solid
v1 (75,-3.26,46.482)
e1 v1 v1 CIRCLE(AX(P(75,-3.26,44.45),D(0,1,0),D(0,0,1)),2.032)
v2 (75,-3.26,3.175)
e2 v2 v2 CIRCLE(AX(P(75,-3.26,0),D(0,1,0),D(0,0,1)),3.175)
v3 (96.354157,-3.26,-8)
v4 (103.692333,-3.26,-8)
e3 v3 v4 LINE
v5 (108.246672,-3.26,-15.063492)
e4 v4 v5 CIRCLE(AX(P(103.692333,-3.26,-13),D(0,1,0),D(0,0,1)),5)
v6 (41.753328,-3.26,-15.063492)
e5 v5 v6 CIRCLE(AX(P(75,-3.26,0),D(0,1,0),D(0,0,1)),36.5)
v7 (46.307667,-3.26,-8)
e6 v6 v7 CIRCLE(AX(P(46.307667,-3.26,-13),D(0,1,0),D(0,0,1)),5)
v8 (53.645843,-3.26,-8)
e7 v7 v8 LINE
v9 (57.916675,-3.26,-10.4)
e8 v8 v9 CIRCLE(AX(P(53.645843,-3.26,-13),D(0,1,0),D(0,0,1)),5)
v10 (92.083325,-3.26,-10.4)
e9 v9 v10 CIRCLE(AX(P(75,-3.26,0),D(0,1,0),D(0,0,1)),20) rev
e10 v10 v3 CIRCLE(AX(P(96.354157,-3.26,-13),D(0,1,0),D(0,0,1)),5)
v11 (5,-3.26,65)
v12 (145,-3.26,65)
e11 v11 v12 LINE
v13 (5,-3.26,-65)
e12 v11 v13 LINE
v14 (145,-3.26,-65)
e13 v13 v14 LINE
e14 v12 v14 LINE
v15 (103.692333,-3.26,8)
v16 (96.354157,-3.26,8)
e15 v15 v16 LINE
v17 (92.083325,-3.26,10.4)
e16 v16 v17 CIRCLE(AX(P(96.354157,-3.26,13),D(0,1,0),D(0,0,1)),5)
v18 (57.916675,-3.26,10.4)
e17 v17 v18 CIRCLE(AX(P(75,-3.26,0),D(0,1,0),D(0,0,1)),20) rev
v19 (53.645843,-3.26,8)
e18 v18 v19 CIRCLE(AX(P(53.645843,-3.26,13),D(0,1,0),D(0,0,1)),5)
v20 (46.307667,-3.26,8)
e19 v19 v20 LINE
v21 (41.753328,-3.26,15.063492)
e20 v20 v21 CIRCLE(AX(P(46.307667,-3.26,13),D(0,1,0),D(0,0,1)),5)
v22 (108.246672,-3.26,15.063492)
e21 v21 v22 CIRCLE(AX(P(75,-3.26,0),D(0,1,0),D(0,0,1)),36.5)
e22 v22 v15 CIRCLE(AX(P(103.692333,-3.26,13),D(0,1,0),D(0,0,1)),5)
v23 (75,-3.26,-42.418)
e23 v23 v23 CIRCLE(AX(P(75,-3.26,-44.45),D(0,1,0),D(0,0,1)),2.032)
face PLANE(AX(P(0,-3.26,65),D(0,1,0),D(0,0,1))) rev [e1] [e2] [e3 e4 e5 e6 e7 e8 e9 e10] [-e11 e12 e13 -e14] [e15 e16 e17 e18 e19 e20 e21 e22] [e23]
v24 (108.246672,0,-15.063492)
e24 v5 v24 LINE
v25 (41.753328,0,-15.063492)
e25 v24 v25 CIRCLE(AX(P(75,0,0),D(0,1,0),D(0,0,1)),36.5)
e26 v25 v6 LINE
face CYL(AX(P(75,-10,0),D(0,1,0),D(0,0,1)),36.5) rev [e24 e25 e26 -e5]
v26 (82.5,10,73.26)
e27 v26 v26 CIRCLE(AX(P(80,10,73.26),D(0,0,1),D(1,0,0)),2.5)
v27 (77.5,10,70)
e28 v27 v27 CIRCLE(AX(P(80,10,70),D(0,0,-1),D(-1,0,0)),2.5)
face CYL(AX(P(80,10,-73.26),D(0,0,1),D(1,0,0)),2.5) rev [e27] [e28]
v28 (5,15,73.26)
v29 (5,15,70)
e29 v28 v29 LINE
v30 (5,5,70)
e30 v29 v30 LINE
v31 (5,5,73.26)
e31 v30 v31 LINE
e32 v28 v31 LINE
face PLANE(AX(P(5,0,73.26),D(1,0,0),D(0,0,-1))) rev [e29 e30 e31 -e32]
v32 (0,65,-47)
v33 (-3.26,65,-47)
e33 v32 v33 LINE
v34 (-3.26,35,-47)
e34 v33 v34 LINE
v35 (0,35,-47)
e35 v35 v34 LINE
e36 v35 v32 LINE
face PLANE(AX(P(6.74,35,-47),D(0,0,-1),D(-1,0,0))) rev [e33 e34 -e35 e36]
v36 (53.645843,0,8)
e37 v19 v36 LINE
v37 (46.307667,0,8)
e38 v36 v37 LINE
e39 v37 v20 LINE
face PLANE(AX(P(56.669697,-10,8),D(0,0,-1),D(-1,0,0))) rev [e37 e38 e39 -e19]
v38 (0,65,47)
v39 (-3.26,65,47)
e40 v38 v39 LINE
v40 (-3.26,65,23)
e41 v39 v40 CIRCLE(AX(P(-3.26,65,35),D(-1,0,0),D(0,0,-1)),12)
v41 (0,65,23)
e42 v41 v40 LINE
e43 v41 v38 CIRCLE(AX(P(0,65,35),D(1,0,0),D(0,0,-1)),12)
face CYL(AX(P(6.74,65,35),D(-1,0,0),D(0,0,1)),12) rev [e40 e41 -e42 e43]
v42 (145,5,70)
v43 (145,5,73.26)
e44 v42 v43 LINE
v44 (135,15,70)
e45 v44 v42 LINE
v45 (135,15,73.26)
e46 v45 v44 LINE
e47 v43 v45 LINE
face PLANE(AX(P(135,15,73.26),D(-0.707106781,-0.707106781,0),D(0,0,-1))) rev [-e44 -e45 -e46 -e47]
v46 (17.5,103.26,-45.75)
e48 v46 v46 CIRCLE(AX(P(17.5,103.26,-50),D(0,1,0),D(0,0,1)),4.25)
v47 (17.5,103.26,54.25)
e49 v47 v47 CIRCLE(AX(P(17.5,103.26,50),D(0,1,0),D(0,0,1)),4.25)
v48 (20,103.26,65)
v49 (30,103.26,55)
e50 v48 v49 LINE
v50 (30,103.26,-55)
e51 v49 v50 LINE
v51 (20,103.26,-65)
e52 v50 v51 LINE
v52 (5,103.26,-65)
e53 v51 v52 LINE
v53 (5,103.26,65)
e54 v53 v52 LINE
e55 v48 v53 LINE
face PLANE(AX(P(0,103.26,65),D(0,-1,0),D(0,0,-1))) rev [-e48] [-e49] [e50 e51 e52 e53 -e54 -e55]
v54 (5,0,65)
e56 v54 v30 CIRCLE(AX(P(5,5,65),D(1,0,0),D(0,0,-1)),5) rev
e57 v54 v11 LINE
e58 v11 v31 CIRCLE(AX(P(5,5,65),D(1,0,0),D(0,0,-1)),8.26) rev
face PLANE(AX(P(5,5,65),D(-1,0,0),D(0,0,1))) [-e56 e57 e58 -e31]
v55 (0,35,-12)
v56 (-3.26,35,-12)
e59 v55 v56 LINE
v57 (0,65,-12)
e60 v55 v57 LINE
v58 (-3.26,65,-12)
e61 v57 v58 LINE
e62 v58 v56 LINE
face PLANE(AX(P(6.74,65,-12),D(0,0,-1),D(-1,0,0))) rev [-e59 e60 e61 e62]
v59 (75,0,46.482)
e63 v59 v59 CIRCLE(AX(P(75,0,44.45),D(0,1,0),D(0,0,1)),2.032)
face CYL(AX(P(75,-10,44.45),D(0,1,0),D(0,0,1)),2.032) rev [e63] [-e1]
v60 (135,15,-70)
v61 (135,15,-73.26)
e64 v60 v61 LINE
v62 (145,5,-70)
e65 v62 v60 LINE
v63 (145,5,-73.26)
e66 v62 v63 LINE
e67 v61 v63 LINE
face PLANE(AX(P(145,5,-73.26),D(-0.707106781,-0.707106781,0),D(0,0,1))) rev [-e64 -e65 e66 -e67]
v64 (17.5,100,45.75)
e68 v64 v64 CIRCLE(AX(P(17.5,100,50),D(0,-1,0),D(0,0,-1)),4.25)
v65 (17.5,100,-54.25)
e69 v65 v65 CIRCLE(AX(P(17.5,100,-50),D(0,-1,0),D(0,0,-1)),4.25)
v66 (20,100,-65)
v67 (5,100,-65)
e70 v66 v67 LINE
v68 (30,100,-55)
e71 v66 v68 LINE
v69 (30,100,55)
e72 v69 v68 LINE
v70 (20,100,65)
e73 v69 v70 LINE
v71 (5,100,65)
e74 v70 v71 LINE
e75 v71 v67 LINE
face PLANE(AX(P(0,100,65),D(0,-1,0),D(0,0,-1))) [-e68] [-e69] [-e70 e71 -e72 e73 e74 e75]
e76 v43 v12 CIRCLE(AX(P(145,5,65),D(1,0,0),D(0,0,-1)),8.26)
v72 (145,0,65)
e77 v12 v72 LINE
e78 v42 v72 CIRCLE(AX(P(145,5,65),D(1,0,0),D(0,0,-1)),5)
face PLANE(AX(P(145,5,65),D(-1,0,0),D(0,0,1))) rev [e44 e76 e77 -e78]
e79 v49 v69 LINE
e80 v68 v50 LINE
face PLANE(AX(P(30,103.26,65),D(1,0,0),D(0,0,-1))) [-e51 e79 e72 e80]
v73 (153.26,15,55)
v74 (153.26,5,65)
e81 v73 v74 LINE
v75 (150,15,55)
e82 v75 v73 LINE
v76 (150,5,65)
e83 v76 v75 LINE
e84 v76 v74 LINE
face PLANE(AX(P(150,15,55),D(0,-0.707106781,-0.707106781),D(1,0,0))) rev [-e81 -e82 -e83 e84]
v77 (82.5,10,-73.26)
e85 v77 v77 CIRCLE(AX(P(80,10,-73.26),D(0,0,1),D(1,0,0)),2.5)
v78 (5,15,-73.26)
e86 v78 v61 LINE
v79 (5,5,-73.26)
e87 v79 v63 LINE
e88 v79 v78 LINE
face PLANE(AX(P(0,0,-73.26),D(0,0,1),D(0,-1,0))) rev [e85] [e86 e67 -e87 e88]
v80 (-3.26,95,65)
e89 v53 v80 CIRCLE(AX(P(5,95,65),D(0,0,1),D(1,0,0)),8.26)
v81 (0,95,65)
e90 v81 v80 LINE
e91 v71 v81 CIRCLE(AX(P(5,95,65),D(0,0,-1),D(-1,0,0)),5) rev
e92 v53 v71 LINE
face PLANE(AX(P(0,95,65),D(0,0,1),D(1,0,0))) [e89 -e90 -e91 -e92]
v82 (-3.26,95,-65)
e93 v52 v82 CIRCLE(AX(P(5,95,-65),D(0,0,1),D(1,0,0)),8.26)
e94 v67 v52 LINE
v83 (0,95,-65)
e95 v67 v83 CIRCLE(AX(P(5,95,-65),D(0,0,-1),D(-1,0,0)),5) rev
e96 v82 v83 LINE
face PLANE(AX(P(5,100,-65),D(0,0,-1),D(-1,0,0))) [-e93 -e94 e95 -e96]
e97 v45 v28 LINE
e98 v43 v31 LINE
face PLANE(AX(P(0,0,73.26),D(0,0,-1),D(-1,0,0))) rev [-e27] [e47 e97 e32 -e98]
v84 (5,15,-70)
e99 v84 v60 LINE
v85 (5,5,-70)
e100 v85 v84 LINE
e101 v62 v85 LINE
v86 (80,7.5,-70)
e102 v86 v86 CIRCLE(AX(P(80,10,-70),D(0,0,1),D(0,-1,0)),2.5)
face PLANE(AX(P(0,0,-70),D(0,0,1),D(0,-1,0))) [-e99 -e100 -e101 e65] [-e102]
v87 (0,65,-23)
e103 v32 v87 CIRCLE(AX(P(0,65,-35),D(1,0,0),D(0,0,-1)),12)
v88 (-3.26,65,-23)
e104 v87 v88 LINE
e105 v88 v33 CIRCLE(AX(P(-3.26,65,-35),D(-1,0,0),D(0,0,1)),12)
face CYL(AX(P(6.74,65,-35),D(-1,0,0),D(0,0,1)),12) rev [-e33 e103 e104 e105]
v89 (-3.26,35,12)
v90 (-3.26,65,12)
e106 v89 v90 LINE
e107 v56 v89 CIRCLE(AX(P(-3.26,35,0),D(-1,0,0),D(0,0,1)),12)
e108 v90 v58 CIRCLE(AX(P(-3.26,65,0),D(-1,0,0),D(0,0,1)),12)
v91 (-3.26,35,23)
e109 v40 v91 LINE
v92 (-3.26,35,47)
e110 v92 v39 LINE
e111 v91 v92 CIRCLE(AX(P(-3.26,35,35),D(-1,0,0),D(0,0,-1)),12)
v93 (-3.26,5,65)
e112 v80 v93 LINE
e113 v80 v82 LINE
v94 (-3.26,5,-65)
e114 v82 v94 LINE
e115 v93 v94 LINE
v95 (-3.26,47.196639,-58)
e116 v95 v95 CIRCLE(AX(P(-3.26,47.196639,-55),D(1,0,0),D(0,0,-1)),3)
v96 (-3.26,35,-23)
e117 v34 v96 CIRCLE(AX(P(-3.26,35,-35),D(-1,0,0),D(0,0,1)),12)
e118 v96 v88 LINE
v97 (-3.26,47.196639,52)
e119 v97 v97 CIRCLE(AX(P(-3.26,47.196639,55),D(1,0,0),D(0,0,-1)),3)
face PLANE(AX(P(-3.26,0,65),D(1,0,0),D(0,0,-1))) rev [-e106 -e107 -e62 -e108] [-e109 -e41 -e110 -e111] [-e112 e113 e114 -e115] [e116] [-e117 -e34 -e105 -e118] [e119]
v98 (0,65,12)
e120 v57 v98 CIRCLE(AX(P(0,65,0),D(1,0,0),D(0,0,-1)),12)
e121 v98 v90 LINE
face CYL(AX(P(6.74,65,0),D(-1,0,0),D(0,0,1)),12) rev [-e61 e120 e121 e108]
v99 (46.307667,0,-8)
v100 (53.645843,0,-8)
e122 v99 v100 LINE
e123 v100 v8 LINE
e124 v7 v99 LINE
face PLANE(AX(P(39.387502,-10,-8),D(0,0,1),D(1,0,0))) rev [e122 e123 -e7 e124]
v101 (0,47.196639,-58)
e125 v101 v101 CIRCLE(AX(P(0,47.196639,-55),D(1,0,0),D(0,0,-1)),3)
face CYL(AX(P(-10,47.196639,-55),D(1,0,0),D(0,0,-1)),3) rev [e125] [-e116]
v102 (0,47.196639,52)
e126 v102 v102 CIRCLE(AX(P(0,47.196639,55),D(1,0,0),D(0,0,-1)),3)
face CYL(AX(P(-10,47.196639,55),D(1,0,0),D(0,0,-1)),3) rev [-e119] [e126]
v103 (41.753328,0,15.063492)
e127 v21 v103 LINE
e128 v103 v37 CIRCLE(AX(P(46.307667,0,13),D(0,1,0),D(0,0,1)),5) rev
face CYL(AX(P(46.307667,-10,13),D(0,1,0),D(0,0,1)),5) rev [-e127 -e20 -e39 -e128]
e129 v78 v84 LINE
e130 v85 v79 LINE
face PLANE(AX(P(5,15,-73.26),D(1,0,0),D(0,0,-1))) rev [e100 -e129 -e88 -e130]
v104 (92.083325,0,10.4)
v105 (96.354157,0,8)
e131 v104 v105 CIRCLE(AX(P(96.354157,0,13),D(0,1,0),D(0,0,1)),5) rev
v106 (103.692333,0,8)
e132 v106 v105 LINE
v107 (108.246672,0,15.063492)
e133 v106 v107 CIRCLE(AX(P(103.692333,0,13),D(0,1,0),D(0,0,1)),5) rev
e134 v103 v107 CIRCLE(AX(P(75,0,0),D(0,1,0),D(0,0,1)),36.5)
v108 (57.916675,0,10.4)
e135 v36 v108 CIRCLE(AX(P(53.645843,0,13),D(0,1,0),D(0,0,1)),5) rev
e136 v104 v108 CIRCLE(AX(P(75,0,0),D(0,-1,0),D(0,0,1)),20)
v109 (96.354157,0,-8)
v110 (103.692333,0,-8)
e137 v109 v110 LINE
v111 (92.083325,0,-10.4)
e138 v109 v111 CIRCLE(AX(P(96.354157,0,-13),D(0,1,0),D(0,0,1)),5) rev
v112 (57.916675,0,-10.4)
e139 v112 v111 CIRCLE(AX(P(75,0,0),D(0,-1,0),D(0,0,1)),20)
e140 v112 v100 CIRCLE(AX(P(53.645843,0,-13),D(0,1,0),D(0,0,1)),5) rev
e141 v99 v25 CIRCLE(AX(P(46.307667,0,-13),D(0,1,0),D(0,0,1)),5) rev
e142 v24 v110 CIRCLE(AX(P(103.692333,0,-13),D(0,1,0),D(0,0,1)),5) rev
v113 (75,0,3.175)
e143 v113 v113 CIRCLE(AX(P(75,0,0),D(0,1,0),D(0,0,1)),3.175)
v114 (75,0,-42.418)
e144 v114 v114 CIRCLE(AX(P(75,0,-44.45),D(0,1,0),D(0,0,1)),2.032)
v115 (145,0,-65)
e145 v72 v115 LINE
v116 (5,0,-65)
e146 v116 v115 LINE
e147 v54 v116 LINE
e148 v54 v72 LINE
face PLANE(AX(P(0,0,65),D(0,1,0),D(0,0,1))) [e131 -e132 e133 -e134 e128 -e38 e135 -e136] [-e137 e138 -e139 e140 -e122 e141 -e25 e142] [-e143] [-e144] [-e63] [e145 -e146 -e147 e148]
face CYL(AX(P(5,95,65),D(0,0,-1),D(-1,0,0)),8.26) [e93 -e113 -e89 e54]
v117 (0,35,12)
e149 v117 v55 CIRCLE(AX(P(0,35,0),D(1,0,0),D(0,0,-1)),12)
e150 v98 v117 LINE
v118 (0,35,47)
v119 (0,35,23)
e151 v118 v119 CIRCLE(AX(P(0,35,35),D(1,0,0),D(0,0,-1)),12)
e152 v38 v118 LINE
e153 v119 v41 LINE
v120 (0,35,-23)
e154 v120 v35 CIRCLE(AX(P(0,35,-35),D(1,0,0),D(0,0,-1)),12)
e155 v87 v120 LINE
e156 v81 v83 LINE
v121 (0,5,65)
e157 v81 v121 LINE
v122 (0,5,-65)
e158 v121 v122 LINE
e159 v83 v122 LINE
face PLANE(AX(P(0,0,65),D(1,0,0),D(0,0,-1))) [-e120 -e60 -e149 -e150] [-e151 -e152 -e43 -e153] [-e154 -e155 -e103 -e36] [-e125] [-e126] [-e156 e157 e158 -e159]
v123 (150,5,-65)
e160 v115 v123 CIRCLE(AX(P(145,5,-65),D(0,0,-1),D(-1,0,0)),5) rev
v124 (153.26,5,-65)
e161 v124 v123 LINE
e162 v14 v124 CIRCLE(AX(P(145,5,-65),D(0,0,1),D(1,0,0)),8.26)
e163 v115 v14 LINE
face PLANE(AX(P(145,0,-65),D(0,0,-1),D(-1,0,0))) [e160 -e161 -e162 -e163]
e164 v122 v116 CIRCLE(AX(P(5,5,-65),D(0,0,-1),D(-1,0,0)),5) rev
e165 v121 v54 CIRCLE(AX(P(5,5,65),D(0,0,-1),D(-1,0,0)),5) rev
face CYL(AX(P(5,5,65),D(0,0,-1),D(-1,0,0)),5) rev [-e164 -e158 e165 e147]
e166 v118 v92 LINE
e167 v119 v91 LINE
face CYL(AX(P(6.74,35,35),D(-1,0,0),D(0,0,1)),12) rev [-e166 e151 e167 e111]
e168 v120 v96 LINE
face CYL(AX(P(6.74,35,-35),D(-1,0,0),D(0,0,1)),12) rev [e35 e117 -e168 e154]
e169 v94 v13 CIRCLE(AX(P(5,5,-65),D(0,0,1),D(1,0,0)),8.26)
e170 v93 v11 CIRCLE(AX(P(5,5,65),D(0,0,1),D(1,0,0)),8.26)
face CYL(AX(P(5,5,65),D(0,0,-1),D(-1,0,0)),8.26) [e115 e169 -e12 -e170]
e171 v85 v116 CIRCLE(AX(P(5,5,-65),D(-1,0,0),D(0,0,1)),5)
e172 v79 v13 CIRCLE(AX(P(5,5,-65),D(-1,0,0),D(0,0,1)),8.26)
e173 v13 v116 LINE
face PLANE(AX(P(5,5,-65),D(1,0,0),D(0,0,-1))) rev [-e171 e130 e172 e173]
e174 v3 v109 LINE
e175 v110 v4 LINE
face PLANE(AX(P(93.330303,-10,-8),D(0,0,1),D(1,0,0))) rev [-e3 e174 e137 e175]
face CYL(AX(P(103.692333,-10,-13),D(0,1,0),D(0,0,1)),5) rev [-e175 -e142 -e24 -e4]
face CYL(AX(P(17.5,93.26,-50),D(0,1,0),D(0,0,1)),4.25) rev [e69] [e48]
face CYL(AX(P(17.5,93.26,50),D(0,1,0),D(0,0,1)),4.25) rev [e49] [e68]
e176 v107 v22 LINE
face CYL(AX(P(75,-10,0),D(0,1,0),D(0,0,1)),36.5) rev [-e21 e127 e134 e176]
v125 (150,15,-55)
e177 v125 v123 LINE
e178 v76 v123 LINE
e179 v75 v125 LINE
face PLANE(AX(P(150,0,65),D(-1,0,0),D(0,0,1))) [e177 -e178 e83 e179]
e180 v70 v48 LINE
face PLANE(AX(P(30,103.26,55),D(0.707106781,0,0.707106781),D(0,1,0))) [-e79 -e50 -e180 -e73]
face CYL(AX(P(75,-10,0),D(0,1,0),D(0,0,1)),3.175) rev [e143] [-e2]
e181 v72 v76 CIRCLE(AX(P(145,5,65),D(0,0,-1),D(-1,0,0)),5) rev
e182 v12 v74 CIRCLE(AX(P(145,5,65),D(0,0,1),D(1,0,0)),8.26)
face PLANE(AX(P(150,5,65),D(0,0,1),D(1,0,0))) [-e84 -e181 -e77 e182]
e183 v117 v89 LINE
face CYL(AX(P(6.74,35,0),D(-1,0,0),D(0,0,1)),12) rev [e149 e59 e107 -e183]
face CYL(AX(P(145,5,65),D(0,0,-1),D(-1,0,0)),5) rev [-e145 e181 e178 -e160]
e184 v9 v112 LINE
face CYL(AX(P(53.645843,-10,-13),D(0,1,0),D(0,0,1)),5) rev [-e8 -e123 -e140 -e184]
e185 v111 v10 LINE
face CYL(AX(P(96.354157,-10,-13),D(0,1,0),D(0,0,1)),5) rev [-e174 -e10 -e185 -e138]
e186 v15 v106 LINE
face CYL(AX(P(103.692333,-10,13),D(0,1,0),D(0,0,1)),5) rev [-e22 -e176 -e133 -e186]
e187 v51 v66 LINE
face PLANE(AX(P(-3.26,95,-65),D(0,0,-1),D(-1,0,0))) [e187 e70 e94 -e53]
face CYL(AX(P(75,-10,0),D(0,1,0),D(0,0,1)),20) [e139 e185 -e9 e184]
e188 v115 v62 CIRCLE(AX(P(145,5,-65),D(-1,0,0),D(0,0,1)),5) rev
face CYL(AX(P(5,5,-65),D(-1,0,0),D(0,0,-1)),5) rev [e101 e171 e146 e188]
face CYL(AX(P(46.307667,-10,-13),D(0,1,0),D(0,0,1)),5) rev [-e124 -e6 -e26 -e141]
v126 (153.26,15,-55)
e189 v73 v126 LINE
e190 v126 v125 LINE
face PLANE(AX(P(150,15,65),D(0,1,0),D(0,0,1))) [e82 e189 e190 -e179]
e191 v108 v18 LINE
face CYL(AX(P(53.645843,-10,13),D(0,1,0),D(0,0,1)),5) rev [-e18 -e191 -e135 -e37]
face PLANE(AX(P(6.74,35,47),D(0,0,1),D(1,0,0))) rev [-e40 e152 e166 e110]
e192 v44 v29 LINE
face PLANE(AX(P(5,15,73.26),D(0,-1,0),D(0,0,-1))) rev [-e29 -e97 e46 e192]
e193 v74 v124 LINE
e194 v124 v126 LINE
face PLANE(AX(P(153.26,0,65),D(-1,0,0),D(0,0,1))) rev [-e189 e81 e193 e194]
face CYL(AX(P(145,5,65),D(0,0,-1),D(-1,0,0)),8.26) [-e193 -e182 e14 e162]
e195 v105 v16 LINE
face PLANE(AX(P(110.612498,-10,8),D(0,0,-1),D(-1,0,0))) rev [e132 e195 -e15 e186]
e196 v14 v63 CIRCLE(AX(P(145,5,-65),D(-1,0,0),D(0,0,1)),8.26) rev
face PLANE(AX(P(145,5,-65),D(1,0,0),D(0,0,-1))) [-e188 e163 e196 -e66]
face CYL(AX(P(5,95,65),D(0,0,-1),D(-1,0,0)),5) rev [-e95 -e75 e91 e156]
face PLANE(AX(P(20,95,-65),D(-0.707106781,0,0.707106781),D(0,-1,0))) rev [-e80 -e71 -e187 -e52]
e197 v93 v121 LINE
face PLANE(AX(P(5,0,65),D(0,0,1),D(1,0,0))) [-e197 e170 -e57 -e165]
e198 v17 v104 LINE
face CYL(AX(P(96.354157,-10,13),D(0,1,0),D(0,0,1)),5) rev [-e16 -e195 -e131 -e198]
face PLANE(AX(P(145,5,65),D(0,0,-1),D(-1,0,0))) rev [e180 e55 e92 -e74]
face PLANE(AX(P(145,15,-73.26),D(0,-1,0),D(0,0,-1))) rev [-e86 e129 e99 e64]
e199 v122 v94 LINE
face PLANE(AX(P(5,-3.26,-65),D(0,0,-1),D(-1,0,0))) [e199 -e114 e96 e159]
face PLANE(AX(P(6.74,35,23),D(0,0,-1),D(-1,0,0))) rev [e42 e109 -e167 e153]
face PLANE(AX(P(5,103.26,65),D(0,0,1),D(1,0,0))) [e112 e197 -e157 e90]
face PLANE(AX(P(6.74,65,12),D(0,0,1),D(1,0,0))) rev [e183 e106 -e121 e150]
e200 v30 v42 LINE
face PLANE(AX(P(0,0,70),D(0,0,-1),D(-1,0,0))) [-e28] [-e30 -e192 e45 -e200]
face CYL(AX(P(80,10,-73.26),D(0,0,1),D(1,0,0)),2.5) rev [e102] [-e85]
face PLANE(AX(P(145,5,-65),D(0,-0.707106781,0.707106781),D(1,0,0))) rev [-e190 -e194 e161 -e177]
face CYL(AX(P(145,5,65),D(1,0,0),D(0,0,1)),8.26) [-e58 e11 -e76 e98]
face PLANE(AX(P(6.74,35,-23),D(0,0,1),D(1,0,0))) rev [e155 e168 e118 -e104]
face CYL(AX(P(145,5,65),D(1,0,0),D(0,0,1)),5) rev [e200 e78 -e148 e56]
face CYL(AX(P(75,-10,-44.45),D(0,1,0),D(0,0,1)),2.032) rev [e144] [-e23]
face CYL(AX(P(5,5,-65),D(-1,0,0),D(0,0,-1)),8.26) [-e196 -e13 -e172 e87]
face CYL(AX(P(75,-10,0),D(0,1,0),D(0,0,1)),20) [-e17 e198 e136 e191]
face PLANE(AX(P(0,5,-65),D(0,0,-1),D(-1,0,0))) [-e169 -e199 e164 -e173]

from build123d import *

# Parameters (mm, degrees)
BASE_FLANGE1_START      = -65
BASE_FLANGE1_DEPTH      = 130
CUT_EXTRUDE1_DEPTH      = 10
SKETCH4_R               = 4.25
CUT_EXTRUDE2_DEPTH      = 10
SKETCH5_R               = 3.175
SKETCH5_R_2             = 2.032
CUT_EXTRUDE3_DEPTH      = 10
CUT_EXTRUDE4_DEPTH      = 10
CHAMFER1_SIZE           = 10
EDGE_FLANGE1_DEPTH      = 140
EDGE_FLANGE1_BEND_DEPTH = 140
FILLET1_R               = 5
CHAMFER2_SIZE           = 10
SKETCH13_R              = 3
CUT_EXTRUDE5_DEPTH      = 10
SKETCH14_R              = 2.5
CUT_EXTRUDE6_DEPTH      = 236.837583095


# Read off the part's stored shape, not the designer's step: Base-Flange1
# Sheet-metal steps are written as plain solids
with BuildPart() as part:
    # Base-Flange1 outline → Base-Flange1 (new body)
    with BuildSketch(Plane.XY.offset(BASE_FLANGE1_START)):
        with BuildLine():
            Line((153.26, 5), (153.26, 15))
            Line((153.26, 15), (150, 15))
            Line((150, 15), (150, 5))
            ThreePointArc((150, 5), (148.535533906, 1.464466094), (145, 0))
            Line((145, 0), (5, 0))
            ThreePointArc((5, 0), (1.464466094, 1.464466094), (0, 5))
            Line((0, 5), (0, 95))
            ThreePointArc((0, 95), (1.464466094, 98.535533906), (5, 100))
            Line((5, 100), (30, 100))
            Line((30, 100), (30, 103.26))
            Line((30, 103.26), (5, 103.26))
            ThreePointArc((5, 103.26), (-0.840702013, 100.840702013), (-3.26, 95))
            Line((-3.26, 95), (-3.26, 5))
            ThreePointArc((-3.26, 5), (-0.840702013, -0.840702013), (5, -3.26))
            Line((5, -3.26), (145, -3.26))
            ThreePointArc((145, -3.26), (150.840702013, -0.840702013), (153.26, 5))
        make_face()
    extrude(amount=BASE_FLANGE1_DEPTH)

    # Sketch3 → Cut-Extrude1 (cut)
    with BuildSketch(Plane.ZY.offset(3.26)):
        with BuildLine():
            Line((-47, 35), (-47, 65))
            ThreePointArc((-47, 65), (-35, 77), (-23, 65))
            Line((-23, 65), (-23, 35))
            ThreePointArc((-23, 35), (-35, 23), (-47, 35))
        make_face()
        with BuildLine():
            Line((47, 35), (47, 65))
            ThreePointArc((47, 65), (35, 77), (23, 65))
            Line((23, 65), (23, 35))
            ThreePointArc((23, 35), (35, 23), (47, 35))
        make_face()
        with BuildLine():
            Line((12, 65), (12, 35))
            ThreePointArc((12, 35), (0, 23), (-12, 35))
            Line((-12, 35), (-12, 65))
            ThreePointArc((-12, 65), (0, 77), (12, 65))
        make_face()
    extrude(amount=-CUT_EXTRUDE1_DEPTH, mode=Mode.SUBTRACT)

    # Sketch4 → Cut-Extrude2 (cut)
    with BuildSketch(Plane(origin=(0, 103.26, 0), x_dir=(1, 0, 0), z_dir=(0, 1, 0))):
        with Locations(Location((17.5, 50, 0), (0, 0, 270))):
            Circle(SKETCH4_R)
        with Locations(Location((17.5, -50, 0), (0, 0, 270))):
            Circle(SKETCH4_R)
    extrude(amount=-CUT_EXTRUDE2_DEPTH, mode=Mode.SUBTRACT)

    # Sketch5 → Cut-Extrude3 (cut)
    with BuildSketch(Plane(origin=(0, 0, 0), x_dir=(1, 0, 0), z_dir=(0, 1, 0))):
        with Locations(Location((75, 0, 0), (0, 0, 270))):
            Circle(SKETCH5_R)
        with Locations(Location((75, 44.45, 0), (0, 0, 270))):
            Circle(SKETCH5_R_2)
        with Locations(Location((75, -44.45, 0), (0, 0, 270))):
            Circle(SKETCH5_R_2)
    extrude(amount=-CUT_EXTRUDE3_DEPTH, mode=Mode.SUBTRACT)

    # Sketch6 → Cut-Extrude4 (cut)
    with BuildSketch(Plane(origin=(0, 0, 0), x_dir=(1, 0, 0), z_dir=(0, 1, 0))):
        with BuildLine():
            Line((39.387502194, 8), (56.66969722, 8))
            ThreePointArc((56.66969722, 8), (75, 20), (93.33030278, 8))
            Line((93.33030278, 8), (110.612497806, 8))
            ThreePointArc((110.612497806, 8), (75, 36.5), (39.387502194, 8))
        make_face()
        with BuildLine():
            Line((110.612497806, -8), (93.33030278, -8))
            ThreePointArc((93.33030278, -8), (75, -20), (56.66969722, -8))
            Line((56.66969722, -8), (39.387502194, -8))
            ThreePointArc((39.387502194, -8), (75, -36.5), (110.612497806, -8))
        make_face()
    extrude(amount=-CUT_EXTRUDE4_DEPTH, mode=Mode.SUBTRACT)

    # Chamfer1
    chamfer1_edges = [part.edges().sort_by_distance(p)[0] for p in [
        (151.63, 15, -65),
        (151.63, 15, 65),
        (30, 101.63, -65),
        (30, 101.63, 65),
    ]]
    chamfer(chamfer1_edges, length=CHAMFER1_SIZE)

    # Edge-Flange1 section (across the edge) → Edge-Flange1 (add)
    with BuildSketch(Plane(origin=(5, 0, 70), x_dir=(0, 0, -1), z_dir=(1, 0, 0))):
        with BuildLine():
            Line((-3.26, 5), (-3.26, 15))
            Line((-3.26, 15), (0, 15))
            Line((0, 15), (0, 5))
            ThreePointArc((0, 5), (1.464466094, 1.464466094), (5, 0))
            Line((5, 0), (5, -3.26))
            ThreePointArc((5, -3.26), (-0.840702013, -0.840702013), (-3.26, 5))
        make_face()
    extrude(amount=EDGE_FLANGE1_DEPTH)

    # Edge-Flange1 section 2 (across the edge) → Edge-Flange1 bend (add)
    with BuildSketch(Plane(origin=(145, 0, -70), x_dir=(0, 0, 1), z_dir=(-1, 0, 0))):
        with BuildLine():
            Line((-3.26, 5), (-3.26, 15))
            Line((-3.26, 15), (0, 15))
            Line((0, 15), (0, 5))
            ThreePointArc((0, 5), (1.464466094, 1.464466094), (5, 0))
            Line((5, 0), (5, -3.26))
            ThreePointArc((5, -3.26), (-0.840702013, -0.840702013), (-3.26, 5))
        make_face()
    extrude(amount=EDGE_FLANGE1_BEND_DEPTH)

    # Fillet1
    fillet1_edges = [part.edges().sort_by_distance(p)[0] for p in [
        (56.66969722, -1.63, 8),
        (93.33030278, -1.63, 8),
        (110.612497806, -1.63, 8),
        (39.387502194, -1.63, 8),
        (93.33030278, -1.63, -8),
        (56.66969722, -1.63, -8),
        (39.387502194, -1.63, -8),
        (110.612497806, -1.63, -8),
    ]]
    fillet(fillet1_edges, radius=FILLET1_R)

    # Chamfer2
    chamfer2_edges = [part.edges().sort_by_distance(p)[0] for p in [
        (145, 15, -71.63),
        (145, 15, 71.63),
    ]]
    chamfer(chamfer2_edges, length=CHAMFER2_SIZE)

    # Sketch13 → Cut-Extrude5 (cut)
    with BuildSketch(Plane(origin=(0, 0, 0), x_dir=(0, 0, -1), z_dir=(1, 0, 0))):
        with Locations((-55, 47.196639222)):
            Circle(SKETCH13_R)
        with Locations((55, 47.196639222)):
            Circle(SKETCH13_R)
    extrude(amount=-CUT_EXTRUDE5_DEPTH, mode=Mode.SUBTRACT)

    # Sketch14 → Cut-Extrude6 (cut, through all)
    with BuildSketch(Plane.XY.offset(73.26)):
        with Locations((80, 10)):
            Circle(SKETCH14_R)
    extrude(amount=-CUT_EXTRUDE6_DEPTH, mode=Mode.SUBTRACT)


solid = part.part
